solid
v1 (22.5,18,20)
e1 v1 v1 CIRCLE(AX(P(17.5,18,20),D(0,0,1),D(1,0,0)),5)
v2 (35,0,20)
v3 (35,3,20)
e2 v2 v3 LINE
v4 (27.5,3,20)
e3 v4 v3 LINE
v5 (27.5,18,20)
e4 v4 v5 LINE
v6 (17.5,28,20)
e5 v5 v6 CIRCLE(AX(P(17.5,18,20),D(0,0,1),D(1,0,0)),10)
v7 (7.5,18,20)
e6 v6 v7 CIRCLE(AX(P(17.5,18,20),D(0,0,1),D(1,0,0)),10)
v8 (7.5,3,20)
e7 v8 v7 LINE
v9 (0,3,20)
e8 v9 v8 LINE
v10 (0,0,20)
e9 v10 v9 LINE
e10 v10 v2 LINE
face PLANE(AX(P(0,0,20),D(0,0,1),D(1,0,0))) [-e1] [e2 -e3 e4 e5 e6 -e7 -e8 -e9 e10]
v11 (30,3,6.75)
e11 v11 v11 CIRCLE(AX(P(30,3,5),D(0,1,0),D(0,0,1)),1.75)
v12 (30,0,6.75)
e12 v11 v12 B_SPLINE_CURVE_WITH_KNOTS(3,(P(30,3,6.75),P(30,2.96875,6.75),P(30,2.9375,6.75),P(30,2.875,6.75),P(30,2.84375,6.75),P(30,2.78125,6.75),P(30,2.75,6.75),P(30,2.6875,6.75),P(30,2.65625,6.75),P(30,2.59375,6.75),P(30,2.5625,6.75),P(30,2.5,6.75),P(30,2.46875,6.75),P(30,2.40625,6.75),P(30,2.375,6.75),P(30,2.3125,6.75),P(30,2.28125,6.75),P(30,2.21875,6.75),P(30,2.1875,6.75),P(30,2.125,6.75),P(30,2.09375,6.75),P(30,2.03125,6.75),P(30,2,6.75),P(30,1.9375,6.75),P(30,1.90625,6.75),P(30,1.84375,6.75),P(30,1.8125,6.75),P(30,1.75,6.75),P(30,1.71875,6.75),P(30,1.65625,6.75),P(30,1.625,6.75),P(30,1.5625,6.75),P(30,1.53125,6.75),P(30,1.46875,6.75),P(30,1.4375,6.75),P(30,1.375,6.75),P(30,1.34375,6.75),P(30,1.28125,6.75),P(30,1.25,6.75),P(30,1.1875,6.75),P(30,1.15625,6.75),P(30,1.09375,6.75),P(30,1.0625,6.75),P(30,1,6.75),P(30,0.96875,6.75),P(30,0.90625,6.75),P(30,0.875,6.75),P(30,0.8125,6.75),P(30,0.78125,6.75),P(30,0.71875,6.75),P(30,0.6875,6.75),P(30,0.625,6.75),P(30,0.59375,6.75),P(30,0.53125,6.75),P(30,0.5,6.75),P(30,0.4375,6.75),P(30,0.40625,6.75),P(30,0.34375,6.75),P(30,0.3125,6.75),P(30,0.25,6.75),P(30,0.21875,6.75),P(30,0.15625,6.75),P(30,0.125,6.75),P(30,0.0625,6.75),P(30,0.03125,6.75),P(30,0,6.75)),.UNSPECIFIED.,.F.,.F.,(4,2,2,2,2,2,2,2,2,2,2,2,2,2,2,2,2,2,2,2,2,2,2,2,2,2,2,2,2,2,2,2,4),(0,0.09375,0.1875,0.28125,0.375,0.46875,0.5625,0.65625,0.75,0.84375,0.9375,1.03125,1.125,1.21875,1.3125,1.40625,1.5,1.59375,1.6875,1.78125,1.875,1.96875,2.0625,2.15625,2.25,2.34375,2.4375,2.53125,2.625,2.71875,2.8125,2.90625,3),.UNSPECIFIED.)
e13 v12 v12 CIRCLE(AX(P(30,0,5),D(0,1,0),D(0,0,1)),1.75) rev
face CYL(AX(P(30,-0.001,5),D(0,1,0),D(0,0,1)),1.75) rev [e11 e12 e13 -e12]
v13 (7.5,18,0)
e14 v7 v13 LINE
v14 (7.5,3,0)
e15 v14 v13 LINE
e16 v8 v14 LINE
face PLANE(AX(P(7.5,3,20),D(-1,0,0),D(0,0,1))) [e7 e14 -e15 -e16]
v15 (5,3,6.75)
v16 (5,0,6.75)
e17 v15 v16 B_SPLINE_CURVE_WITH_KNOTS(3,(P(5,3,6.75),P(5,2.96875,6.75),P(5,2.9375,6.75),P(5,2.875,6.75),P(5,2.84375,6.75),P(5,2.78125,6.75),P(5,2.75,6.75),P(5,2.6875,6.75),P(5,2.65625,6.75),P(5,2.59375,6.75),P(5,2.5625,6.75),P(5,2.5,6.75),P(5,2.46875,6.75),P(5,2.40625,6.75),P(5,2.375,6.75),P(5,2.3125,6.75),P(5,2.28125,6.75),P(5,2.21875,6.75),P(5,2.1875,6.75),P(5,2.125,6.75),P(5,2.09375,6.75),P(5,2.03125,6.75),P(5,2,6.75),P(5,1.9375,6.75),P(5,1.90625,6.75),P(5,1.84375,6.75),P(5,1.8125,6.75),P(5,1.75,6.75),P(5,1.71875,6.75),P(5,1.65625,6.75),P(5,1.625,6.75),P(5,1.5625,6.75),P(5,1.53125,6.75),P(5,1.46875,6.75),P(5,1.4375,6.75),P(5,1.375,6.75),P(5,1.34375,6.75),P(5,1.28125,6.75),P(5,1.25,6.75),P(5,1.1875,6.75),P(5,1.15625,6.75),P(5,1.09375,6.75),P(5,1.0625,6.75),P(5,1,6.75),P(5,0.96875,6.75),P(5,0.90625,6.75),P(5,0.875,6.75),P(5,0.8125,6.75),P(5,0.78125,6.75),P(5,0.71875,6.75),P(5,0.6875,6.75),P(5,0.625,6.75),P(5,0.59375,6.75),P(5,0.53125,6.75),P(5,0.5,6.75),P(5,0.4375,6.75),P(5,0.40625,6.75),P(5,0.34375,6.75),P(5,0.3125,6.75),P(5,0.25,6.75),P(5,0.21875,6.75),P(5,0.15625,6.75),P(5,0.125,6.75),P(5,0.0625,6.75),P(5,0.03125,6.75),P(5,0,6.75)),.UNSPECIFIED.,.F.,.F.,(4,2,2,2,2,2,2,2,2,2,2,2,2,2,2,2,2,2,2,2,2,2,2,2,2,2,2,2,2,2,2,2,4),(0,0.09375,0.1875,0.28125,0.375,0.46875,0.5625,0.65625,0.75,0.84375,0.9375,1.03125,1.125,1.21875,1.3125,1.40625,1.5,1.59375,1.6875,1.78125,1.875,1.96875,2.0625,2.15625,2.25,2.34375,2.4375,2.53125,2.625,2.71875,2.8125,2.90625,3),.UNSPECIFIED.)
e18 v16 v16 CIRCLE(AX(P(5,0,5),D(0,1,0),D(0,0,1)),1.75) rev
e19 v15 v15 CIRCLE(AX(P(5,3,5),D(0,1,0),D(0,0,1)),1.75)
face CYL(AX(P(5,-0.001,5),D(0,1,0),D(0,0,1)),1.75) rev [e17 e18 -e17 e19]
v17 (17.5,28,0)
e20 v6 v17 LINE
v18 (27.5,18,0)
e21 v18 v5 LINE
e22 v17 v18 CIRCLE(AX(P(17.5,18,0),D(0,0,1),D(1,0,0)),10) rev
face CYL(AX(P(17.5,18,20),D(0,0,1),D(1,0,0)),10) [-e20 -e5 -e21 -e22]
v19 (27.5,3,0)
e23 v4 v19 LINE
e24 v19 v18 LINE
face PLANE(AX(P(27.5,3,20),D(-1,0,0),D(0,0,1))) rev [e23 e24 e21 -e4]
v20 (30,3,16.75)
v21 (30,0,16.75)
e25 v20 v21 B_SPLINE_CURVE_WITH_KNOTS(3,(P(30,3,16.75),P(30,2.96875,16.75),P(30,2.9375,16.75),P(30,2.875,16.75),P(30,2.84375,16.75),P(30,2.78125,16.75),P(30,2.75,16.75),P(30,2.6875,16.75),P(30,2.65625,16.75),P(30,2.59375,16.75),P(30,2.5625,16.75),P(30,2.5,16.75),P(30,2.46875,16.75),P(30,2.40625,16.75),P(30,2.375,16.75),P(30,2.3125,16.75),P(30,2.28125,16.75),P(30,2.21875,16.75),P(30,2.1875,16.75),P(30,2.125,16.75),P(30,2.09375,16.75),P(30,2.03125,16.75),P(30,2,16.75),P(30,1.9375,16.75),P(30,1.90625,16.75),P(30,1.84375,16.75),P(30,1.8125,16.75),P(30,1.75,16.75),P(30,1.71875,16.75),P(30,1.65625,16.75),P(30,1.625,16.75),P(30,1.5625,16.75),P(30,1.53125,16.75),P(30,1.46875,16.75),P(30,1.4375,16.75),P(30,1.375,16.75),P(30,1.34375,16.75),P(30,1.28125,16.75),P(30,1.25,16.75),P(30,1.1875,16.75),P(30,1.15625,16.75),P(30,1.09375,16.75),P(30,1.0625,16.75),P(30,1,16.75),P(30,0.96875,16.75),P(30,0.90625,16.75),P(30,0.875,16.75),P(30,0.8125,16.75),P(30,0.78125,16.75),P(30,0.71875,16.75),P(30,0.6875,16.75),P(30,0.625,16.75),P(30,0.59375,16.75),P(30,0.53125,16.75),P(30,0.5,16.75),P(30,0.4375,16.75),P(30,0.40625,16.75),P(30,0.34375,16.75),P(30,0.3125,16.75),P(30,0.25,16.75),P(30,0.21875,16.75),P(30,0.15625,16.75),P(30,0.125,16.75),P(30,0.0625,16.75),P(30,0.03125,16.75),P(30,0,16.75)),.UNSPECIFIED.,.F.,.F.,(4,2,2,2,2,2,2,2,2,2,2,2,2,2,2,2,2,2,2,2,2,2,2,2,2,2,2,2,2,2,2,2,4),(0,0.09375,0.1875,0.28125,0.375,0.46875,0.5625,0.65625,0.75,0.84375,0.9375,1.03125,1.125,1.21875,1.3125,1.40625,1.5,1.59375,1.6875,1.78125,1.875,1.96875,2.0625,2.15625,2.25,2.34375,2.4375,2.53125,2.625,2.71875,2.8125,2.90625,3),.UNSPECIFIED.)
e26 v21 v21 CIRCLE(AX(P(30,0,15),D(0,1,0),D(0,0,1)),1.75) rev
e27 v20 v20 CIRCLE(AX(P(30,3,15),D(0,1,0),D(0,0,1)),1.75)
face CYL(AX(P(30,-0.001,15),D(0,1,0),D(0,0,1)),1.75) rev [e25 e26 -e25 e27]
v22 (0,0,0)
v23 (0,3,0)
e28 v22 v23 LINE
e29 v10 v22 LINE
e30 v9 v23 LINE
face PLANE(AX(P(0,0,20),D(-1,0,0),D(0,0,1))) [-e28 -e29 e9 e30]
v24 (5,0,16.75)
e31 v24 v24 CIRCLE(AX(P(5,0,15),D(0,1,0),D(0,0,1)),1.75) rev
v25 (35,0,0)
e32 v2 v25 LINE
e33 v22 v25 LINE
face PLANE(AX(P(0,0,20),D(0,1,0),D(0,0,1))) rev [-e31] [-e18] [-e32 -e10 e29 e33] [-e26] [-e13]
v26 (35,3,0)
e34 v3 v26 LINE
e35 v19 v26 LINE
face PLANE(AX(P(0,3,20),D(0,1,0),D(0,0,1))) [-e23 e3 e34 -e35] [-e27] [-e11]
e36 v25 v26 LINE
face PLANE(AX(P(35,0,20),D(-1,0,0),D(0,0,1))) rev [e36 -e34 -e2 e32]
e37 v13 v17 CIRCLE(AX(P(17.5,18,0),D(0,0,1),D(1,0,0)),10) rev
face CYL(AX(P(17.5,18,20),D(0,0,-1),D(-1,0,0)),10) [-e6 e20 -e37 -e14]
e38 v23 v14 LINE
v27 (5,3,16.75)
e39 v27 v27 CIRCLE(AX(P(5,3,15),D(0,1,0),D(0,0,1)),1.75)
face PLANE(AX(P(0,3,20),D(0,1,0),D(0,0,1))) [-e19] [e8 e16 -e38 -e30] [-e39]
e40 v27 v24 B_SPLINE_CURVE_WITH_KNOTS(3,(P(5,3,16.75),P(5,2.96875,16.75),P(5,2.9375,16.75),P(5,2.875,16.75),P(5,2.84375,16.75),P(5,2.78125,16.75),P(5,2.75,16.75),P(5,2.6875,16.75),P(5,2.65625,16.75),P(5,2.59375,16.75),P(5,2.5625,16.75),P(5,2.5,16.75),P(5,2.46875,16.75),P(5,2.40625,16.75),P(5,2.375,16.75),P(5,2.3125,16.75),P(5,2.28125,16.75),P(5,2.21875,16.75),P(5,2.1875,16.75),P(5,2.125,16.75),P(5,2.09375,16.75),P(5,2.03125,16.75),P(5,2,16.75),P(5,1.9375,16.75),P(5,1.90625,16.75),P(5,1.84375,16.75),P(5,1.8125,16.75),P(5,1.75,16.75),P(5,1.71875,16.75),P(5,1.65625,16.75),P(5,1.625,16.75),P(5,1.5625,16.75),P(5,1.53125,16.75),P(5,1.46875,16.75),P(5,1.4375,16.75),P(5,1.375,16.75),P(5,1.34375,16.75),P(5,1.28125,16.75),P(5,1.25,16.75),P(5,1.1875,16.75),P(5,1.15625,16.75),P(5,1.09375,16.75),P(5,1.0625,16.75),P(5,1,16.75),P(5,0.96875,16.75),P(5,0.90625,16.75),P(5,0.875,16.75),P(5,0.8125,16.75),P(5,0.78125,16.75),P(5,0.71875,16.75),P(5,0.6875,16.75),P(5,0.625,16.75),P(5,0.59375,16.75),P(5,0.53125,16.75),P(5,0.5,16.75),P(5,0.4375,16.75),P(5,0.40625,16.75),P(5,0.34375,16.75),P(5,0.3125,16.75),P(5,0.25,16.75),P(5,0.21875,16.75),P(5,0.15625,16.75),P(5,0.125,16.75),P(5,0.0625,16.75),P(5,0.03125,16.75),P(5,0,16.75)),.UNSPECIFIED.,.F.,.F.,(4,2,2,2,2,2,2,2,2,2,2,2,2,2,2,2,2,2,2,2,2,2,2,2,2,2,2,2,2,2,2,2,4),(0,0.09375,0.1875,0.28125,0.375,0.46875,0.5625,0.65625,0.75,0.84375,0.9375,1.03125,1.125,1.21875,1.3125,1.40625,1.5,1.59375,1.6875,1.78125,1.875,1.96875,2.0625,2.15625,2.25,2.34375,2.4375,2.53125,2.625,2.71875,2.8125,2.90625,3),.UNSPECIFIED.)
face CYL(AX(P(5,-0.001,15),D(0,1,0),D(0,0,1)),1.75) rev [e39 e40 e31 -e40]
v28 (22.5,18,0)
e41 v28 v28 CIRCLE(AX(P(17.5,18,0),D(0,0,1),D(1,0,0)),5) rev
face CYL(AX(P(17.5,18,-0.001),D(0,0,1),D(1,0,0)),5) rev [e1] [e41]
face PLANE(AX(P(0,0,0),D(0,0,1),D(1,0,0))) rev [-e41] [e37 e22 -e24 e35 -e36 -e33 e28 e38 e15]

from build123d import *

# Parameters (mm, degrees)
SKETCH_1_W          = 35
SKETCH_1_H          = 3
SKETCH_1_W_2        = 20
SKETCH_1_H_2        = 25
EXTRUDE_1_DEPTH     = 20
FILLET_1_R          = 10
FILLET_2_R          = 10
CUT_EXTRUDE_1_REACH = 51.082
SKETCH_2_R          = 5
CUT_EXTRUDE_2_REACH = 49.434
SKETCH_4_R          = 1.75


with BuildPart() as part:
    # 草图1 → 凸台-拉伸1 (new body)
    with BuildSketch(Plane.XY):
        with Locations((17.5, 1.5)):
            Rectangle(SKETCH_1_W, SKETCH_1_H)
        with Locations((17.5, 15.5)):
            Rectangle(SKETCH_1_W_2, SKETCH_1_H_2)
    extrude(amount=EXTRUDE_1_DEPTH)

    # 圆角1
    fillet_1_edges = [part.edges().sort_by_distance(p)[0] for p in [
        (27.5, 28, 10),
    ]]
    fillet(fillet_1_edges, radius=FILLET_1_R)

    # 圆角2
    fillet_2_edges = [part.edges().sort_by_distance(p)[0] for p in [
        (7.5, 28, 10),
    ]]
    fillet(fillet_2_edges, radius=FILLET_2_R - 0.0001)  # a hair under: the kernel refuses the full size

    # 草图2 → 切除-拉伸1 (cut, up to next)
    with BuildSketch(Plane.XY.offset(20), mode=Mode.PRIVATE) as cut_extrude_1_sk1:
        with Locations((17.5, 18)):
            Circle(SKETCH_2_R)
    cut_extrude_1_tool1 = extrude(cut_extrude_1_sk1.sketch, amount=-CUT_EXTRUDE_1_REACH, mode=Mode.PRIVATE) & part.part
    add(cut_extrude_1_tool1.solids().sort_by_distance((17.5, 18, 20))[0], mode=Mode.SUBTRACT)

    # 草图4 → 切除-拉伸2 (cut, up to next)
    with BuildSketch(Plane(origin=(0, 3, 0), x_dir=(1, 0, 0), z_dir=(0, 1, 0)), mode=Mode.PRIVATE) as cut_extrude_2_sk1:
        with Locations(Location((30, -15, 0), (0, 0, 270))):
            Circle(SKETCH_4_R)
    cut_extrude_2_tool1 = extrude(cut_extrude_2_sk1.sketch, amount=-CUT_EXTRUDE_2_REACH, mode=Mode.PRIVATE) & part.part
    # 草图4 → 切除-拉伸2 (cut, up to next)
    with BuildSketch(Plane(origin=(0, 3, 0), x_dir=(1, 0, 0), z_dir=(0, 1, 0)), mode=Mode.PRIVATE) as cut_extrude_2_sk2:
        with Locations(Location((30, -5, 0), (0, 0, 270))):
            Circle(SKETCH_4_R)
    cut_extrude_2_tool2 = extrude(cut_extrude_2_sk2.sketch, amount=-CUT_EXTRUDE_2_REACH, mode=Mode.PRIVATE) & part.part
    # 草图4 → 切除-拉伸2 (cut, up to next)
    with BuildSketch(Plane(origin=(0, 3, 0), x_dir=(1, 0, 0), z_dir=(0, 1, 0)), mode=Mode.PRIVATE) as cut_extrude_2_sk3:
        with Locations(Location((5, -15, 0), (0, 0, 270))):
            Circle(SKETCH_4_R)
    cut_extrude_2_tool3 = extrude(cut_extrude_2_sk3.sketch, amount=-CUT_EXTRUDE_2_REACH, mode=Mode.PRIVATE) & part.part
    # 草图4 → 切除-拉伸2 (cut, up to next)
    with BuildSketch(Plane(origin=(0, 3, 0), x_dir=(1, 0, 0), z_dir=(0, 1, 0)), mode=Mode.PRIVATE) as cut_extrude_2_sk4:
        with Locations(Location((5, -5, 0), (0, 0, 270))):
            Circle(SKETCH_4_R)
    cut_extrude_2_tool4 = extrude(cut_extrude_2_sk4.sketch, amount=-CUT_EXTRUDE_2_REACH, mode=Mode.PRIVATE) & part.part
    add(cut_extrude_2_tool1.solids().sort_by_distance((30, 3, 15))[0], mode=Mode.SUBTRACT)
    add(cut_extrude_2_tool2.solids().sort_by_distance((30, 3, 5))[0], mode=Mode.SUBTRACT)
    add(cut_extrude_2_tool3.solids().sort_by_distance((5, 3, 15))[0], mode=Mode.SUBTRACT)
    add(cut_extrude_2_tool4.solids().sort_by_distance((5, 3, 5))[0], mode=Mode.SUBTRACT)


solid = part.part
